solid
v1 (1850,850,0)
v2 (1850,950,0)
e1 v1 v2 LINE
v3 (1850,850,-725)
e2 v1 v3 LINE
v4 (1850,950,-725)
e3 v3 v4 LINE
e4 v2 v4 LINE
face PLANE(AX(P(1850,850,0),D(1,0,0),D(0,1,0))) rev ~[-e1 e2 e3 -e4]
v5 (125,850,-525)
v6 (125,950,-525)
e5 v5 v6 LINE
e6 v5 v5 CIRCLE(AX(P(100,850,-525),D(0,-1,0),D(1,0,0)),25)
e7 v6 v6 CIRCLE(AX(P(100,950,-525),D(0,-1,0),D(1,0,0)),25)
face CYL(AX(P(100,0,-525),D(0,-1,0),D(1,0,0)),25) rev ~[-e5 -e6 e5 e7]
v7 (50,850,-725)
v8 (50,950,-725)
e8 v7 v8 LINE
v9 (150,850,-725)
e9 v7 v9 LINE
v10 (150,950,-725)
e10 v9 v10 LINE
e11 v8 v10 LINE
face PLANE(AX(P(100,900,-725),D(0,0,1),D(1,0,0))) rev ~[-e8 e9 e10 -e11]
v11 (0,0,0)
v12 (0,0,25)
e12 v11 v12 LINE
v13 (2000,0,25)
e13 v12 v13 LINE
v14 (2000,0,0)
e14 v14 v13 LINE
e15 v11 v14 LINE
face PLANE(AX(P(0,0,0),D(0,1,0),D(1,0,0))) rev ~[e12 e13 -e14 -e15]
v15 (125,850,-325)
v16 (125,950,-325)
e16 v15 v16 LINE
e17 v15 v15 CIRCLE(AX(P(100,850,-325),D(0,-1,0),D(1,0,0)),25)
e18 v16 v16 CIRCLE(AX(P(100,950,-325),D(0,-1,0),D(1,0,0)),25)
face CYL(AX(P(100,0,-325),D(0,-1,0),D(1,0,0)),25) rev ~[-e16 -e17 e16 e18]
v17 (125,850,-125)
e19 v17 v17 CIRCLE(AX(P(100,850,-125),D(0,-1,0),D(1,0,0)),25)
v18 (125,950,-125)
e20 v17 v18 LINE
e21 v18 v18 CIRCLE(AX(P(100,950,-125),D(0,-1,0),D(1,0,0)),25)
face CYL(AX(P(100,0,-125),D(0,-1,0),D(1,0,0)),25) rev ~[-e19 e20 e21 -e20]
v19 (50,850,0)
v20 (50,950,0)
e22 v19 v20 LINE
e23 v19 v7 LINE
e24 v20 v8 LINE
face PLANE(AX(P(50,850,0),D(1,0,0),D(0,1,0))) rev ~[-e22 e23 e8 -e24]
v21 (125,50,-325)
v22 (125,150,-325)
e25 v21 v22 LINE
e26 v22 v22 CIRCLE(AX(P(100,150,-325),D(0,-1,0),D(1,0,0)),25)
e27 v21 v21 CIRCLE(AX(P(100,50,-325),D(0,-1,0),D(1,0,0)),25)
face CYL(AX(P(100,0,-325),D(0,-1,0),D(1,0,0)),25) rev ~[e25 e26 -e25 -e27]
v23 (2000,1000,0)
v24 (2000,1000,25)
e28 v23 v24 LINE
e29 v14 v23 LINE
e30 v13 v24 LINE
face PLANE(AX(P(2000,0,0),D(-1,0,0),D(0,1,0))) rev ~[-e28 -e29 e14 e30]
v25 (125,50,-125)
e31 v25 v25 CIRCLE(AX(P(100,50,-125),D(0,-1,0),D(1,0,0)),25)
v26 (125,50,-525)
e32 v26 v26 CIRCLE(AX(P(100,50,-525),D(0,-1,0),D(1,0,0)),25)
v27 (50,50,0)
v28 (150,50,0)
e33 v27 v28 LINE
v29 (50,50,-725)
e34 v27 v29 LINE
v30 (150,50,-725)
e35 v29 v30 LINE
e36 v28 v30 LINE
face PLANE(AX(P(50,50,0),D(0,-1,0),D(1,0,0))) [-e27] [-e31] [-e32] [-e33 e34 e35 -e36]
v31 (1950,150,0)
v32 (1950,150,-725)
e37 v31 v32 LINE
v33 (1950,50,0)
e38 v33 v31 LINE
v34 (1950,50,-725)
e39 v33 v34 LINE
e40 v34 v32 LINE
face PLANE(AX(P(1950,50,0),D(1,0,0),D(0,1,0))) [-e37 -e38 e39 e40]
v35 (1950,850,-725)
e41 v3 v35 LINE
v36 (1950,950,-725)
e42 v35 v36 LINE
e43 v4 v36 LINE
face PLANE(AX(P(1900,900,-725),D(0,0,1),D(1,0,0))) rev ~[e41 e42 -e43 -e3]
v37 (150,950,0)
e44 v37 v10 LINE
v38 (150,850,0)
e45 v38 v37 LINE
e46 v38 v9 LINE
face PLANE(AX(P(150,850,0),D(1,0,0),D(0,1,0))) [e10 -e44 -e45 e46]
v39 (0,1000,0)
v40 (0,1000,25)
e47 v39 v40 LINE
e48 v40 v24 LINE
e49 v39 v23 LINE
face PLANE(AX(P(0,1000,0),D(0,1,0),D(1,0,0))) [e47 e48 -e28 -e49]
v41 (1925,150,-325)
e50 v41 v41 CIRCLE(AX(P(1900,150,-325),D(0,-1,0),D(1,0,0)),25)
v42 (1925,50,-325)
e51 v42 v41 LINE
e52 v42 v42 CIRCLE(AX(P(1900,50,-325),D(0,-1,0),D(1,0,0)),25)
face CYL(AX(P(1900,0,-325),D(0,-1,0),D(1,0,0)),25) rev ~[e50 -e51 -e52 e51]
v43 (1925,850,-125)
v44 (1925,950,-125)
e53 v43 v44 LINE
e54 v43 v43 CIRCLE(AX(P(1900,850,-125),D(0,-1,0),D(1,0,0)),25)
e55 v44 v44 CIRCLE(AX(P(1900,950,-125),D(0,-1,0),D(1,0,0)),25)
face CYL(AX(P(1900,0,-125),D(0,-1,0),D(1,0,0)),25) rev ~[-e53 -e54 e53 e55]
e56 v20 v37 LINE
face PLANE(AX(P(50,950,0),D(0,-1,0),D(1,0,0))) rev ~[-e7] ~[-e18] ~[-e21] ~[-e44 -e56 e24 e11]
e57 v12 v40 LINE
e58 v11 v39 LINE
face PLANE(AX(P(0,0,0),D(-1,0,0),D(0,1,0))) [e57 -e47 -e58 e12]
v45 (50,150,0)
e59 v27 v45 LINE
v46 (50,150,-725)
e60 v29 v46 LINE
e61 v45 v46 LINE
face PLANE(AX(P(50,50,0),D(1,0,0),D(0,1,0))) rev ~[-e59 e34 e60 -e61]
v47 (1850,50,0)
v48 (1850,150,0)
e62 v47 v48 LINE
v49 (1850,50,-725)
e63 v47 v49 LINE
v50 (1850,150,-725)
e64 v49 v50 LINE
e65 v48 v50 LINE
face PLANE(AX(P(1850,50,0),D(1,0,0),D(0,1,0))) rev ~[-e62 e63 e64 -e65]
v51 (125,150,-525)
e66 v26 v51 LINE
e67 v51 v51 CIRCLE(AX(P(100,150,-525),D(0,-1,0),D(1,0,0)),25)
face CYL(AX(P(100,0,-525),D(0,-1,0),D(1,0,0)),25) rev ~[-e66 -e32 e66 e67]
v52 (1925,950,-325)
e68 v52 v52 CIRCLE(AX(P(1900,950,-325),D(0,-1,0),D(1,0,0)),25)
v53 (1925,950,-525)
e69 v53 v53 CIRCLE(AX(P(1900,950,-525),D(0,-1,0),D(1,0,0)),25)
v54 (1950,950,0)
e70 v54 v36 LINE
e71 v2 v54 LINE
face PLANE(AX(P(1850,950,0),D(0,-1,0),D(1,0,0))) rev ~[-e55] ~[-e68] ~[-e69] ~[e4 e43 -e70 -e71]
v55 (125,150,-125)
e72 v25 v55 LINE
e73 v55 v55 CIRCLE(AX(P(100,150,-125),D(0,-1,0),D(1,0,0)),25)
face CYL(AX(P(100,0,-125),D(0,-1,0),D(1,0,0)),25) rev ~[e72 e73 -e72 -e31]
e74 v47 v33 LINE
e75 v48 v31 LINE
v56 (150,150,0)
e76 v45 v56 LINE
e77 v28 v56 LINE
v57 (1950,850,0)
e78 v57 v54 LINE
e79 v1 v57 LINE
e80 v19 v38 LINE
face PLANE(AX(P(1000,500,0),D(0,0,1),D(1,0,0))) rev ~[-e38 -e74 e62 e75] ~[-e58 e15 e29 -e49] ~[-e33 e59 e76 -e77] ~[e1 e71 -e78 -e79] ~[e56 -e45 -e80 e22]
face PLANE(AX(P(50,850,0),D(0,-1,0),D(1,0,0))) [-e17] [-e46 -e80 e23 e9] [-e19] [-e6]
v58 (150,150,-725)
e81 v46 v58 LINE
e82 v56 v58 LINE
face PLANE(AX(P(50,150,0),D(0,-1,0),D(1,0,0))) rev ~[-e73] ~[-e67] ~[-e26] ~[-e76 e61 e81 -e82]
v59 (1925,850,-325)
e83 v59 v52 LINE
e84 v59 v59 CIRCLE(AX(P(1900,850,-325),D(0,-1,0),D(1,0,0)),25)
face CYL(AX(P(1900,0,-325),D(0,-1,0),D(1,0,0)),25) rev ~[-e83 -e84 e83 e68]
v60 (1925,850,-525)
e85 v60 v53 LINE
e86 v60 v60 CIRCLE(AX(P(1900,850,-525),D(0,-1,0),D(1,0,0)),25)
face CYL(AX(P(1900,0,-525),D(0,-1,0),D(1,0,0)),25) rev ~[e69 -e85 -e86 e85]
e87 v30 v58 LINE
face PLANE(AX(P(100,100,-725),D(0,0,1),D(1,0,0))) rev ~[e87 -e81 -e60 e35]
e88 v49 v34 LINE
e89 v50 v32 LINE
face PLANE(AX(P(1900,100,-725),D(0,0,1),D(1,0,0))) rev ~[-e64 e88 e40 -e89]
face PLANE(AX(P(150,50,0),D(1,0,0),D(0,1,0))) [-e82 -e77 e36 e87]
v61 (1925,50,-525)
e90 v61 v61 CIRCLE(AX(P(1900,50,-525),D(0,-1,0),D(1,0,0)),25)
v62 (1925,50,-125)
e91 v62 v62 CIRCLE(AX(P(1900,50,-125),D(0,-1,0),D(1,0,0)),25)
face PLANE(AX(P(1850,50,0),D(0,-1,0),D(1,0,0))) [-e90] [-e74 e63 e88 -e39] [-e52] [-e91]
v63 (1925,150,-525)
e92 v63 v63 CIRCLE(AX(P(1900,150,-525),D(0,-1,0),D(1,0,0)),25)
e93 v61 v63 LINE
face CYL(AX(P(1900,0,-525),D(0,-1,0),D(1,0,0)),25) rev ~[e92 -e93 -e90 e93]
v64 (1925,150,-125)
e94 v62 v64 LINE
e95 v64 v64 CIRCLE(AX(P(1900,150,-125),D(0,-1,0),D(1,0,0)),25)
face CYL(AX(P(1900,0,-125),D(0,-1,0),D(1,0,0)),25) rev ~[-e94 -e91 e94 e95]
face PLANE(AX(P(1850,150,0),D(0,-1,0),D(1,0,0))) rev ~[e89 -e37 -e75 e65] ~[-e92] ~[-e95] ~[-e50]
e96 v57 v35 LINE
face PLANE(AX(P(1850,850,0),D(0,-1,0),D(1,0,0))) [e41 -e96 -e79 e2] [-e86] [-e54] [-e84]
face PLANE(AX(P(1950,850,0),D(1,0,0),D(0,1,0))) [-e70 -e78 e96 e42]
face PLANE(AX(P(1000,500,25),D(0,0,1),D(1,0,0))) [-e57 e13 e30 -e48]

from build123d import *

# Parameters (mm, degrees)
F0_W      = 2000
F0_H      = 1000
F1_DEPTH  = 25
F2_W      = 100
F2_H      = 100
F3_DEPTH  = 725
F4_W      = 100
F4_H      = 100
F5_DEPTH  = 725
F6_W      = 100
F6_H      = 100
F7_DEPTH  = 725
F8_W      = 100
F8_H      = 100
F9_DEPTH  = 725
F10_R     = 25
F11_DEPTH = 1000.001
F12_R     = 25
F13_DEPTH = 1000.001


# Not quite as in the source:
# - a feature of the source that left no trace in its solid (it failed there, or was rolled back) is left out


with BuildPart() as f1:
    # F0 (on Top) → F1 (new body)
    with BuildSketch(Plane.XY):
        with Locations((1000, 500)):
            Rectangle(F0_W, F0_H)
    extrude(amount=F1_DEPTH)

    # F2 (on Top) → F3 (join)
    with BuildSketch(Plane.XY):
        with Locations((100, 100)):
            Rectangle(F2_W, F2_H)
    extrude(amount=-F3_DEPTH)

    # F4 (on Top) → F5 (join)
    with BuildSketch(Plane.XY):
        with Locations((1900, 100)):
            Rectangle(F4_W, F4_H)
    extrude(amount=-F5_DEPTH)

    # F6 (on Top) → F7 (join)
    with BuildSketch(Plane.XY):
        with Locations((100, 900)):
            Rectangle(F6_W, F6_H)
    extrude(amount=-F7_DEPTH)

    # F8 (on Top) → F9 (join)
    with BuildSketch(Plane.XY):
        with Locations((1900, 900)):
            Rectangle(F8_W, F8_H)
    extrude(amount=-F9_DEPTH)

    # F10 (on Front) → F11 (cut, through all)
    with BuildSketch(Plane.XZ):
        with Locations((100, -525)):
            Circle(F10_R)
        with Locations((100, -325)):
            Circle(F10_R)
        with Locations((100, -125)):
            Circle(F10_R)
    extrude(amount=-F11_DEPTH, mode=Mode.SUBTRACT)

    # F12 (on Front) → F13 (cut, through all)
    with BuildSketch(Plane.XZ):
        with Locations((1900, -525)):
            Circle(F12_R)
        with Locations((1900, -325)):
            Circle(F12_R)
        with Locations((1900, -125)):
            Circle(F12_R)
    extrude(amount=-F13_DEPTH, mode=Mode.SUBTRACT)


solid = f1.part
